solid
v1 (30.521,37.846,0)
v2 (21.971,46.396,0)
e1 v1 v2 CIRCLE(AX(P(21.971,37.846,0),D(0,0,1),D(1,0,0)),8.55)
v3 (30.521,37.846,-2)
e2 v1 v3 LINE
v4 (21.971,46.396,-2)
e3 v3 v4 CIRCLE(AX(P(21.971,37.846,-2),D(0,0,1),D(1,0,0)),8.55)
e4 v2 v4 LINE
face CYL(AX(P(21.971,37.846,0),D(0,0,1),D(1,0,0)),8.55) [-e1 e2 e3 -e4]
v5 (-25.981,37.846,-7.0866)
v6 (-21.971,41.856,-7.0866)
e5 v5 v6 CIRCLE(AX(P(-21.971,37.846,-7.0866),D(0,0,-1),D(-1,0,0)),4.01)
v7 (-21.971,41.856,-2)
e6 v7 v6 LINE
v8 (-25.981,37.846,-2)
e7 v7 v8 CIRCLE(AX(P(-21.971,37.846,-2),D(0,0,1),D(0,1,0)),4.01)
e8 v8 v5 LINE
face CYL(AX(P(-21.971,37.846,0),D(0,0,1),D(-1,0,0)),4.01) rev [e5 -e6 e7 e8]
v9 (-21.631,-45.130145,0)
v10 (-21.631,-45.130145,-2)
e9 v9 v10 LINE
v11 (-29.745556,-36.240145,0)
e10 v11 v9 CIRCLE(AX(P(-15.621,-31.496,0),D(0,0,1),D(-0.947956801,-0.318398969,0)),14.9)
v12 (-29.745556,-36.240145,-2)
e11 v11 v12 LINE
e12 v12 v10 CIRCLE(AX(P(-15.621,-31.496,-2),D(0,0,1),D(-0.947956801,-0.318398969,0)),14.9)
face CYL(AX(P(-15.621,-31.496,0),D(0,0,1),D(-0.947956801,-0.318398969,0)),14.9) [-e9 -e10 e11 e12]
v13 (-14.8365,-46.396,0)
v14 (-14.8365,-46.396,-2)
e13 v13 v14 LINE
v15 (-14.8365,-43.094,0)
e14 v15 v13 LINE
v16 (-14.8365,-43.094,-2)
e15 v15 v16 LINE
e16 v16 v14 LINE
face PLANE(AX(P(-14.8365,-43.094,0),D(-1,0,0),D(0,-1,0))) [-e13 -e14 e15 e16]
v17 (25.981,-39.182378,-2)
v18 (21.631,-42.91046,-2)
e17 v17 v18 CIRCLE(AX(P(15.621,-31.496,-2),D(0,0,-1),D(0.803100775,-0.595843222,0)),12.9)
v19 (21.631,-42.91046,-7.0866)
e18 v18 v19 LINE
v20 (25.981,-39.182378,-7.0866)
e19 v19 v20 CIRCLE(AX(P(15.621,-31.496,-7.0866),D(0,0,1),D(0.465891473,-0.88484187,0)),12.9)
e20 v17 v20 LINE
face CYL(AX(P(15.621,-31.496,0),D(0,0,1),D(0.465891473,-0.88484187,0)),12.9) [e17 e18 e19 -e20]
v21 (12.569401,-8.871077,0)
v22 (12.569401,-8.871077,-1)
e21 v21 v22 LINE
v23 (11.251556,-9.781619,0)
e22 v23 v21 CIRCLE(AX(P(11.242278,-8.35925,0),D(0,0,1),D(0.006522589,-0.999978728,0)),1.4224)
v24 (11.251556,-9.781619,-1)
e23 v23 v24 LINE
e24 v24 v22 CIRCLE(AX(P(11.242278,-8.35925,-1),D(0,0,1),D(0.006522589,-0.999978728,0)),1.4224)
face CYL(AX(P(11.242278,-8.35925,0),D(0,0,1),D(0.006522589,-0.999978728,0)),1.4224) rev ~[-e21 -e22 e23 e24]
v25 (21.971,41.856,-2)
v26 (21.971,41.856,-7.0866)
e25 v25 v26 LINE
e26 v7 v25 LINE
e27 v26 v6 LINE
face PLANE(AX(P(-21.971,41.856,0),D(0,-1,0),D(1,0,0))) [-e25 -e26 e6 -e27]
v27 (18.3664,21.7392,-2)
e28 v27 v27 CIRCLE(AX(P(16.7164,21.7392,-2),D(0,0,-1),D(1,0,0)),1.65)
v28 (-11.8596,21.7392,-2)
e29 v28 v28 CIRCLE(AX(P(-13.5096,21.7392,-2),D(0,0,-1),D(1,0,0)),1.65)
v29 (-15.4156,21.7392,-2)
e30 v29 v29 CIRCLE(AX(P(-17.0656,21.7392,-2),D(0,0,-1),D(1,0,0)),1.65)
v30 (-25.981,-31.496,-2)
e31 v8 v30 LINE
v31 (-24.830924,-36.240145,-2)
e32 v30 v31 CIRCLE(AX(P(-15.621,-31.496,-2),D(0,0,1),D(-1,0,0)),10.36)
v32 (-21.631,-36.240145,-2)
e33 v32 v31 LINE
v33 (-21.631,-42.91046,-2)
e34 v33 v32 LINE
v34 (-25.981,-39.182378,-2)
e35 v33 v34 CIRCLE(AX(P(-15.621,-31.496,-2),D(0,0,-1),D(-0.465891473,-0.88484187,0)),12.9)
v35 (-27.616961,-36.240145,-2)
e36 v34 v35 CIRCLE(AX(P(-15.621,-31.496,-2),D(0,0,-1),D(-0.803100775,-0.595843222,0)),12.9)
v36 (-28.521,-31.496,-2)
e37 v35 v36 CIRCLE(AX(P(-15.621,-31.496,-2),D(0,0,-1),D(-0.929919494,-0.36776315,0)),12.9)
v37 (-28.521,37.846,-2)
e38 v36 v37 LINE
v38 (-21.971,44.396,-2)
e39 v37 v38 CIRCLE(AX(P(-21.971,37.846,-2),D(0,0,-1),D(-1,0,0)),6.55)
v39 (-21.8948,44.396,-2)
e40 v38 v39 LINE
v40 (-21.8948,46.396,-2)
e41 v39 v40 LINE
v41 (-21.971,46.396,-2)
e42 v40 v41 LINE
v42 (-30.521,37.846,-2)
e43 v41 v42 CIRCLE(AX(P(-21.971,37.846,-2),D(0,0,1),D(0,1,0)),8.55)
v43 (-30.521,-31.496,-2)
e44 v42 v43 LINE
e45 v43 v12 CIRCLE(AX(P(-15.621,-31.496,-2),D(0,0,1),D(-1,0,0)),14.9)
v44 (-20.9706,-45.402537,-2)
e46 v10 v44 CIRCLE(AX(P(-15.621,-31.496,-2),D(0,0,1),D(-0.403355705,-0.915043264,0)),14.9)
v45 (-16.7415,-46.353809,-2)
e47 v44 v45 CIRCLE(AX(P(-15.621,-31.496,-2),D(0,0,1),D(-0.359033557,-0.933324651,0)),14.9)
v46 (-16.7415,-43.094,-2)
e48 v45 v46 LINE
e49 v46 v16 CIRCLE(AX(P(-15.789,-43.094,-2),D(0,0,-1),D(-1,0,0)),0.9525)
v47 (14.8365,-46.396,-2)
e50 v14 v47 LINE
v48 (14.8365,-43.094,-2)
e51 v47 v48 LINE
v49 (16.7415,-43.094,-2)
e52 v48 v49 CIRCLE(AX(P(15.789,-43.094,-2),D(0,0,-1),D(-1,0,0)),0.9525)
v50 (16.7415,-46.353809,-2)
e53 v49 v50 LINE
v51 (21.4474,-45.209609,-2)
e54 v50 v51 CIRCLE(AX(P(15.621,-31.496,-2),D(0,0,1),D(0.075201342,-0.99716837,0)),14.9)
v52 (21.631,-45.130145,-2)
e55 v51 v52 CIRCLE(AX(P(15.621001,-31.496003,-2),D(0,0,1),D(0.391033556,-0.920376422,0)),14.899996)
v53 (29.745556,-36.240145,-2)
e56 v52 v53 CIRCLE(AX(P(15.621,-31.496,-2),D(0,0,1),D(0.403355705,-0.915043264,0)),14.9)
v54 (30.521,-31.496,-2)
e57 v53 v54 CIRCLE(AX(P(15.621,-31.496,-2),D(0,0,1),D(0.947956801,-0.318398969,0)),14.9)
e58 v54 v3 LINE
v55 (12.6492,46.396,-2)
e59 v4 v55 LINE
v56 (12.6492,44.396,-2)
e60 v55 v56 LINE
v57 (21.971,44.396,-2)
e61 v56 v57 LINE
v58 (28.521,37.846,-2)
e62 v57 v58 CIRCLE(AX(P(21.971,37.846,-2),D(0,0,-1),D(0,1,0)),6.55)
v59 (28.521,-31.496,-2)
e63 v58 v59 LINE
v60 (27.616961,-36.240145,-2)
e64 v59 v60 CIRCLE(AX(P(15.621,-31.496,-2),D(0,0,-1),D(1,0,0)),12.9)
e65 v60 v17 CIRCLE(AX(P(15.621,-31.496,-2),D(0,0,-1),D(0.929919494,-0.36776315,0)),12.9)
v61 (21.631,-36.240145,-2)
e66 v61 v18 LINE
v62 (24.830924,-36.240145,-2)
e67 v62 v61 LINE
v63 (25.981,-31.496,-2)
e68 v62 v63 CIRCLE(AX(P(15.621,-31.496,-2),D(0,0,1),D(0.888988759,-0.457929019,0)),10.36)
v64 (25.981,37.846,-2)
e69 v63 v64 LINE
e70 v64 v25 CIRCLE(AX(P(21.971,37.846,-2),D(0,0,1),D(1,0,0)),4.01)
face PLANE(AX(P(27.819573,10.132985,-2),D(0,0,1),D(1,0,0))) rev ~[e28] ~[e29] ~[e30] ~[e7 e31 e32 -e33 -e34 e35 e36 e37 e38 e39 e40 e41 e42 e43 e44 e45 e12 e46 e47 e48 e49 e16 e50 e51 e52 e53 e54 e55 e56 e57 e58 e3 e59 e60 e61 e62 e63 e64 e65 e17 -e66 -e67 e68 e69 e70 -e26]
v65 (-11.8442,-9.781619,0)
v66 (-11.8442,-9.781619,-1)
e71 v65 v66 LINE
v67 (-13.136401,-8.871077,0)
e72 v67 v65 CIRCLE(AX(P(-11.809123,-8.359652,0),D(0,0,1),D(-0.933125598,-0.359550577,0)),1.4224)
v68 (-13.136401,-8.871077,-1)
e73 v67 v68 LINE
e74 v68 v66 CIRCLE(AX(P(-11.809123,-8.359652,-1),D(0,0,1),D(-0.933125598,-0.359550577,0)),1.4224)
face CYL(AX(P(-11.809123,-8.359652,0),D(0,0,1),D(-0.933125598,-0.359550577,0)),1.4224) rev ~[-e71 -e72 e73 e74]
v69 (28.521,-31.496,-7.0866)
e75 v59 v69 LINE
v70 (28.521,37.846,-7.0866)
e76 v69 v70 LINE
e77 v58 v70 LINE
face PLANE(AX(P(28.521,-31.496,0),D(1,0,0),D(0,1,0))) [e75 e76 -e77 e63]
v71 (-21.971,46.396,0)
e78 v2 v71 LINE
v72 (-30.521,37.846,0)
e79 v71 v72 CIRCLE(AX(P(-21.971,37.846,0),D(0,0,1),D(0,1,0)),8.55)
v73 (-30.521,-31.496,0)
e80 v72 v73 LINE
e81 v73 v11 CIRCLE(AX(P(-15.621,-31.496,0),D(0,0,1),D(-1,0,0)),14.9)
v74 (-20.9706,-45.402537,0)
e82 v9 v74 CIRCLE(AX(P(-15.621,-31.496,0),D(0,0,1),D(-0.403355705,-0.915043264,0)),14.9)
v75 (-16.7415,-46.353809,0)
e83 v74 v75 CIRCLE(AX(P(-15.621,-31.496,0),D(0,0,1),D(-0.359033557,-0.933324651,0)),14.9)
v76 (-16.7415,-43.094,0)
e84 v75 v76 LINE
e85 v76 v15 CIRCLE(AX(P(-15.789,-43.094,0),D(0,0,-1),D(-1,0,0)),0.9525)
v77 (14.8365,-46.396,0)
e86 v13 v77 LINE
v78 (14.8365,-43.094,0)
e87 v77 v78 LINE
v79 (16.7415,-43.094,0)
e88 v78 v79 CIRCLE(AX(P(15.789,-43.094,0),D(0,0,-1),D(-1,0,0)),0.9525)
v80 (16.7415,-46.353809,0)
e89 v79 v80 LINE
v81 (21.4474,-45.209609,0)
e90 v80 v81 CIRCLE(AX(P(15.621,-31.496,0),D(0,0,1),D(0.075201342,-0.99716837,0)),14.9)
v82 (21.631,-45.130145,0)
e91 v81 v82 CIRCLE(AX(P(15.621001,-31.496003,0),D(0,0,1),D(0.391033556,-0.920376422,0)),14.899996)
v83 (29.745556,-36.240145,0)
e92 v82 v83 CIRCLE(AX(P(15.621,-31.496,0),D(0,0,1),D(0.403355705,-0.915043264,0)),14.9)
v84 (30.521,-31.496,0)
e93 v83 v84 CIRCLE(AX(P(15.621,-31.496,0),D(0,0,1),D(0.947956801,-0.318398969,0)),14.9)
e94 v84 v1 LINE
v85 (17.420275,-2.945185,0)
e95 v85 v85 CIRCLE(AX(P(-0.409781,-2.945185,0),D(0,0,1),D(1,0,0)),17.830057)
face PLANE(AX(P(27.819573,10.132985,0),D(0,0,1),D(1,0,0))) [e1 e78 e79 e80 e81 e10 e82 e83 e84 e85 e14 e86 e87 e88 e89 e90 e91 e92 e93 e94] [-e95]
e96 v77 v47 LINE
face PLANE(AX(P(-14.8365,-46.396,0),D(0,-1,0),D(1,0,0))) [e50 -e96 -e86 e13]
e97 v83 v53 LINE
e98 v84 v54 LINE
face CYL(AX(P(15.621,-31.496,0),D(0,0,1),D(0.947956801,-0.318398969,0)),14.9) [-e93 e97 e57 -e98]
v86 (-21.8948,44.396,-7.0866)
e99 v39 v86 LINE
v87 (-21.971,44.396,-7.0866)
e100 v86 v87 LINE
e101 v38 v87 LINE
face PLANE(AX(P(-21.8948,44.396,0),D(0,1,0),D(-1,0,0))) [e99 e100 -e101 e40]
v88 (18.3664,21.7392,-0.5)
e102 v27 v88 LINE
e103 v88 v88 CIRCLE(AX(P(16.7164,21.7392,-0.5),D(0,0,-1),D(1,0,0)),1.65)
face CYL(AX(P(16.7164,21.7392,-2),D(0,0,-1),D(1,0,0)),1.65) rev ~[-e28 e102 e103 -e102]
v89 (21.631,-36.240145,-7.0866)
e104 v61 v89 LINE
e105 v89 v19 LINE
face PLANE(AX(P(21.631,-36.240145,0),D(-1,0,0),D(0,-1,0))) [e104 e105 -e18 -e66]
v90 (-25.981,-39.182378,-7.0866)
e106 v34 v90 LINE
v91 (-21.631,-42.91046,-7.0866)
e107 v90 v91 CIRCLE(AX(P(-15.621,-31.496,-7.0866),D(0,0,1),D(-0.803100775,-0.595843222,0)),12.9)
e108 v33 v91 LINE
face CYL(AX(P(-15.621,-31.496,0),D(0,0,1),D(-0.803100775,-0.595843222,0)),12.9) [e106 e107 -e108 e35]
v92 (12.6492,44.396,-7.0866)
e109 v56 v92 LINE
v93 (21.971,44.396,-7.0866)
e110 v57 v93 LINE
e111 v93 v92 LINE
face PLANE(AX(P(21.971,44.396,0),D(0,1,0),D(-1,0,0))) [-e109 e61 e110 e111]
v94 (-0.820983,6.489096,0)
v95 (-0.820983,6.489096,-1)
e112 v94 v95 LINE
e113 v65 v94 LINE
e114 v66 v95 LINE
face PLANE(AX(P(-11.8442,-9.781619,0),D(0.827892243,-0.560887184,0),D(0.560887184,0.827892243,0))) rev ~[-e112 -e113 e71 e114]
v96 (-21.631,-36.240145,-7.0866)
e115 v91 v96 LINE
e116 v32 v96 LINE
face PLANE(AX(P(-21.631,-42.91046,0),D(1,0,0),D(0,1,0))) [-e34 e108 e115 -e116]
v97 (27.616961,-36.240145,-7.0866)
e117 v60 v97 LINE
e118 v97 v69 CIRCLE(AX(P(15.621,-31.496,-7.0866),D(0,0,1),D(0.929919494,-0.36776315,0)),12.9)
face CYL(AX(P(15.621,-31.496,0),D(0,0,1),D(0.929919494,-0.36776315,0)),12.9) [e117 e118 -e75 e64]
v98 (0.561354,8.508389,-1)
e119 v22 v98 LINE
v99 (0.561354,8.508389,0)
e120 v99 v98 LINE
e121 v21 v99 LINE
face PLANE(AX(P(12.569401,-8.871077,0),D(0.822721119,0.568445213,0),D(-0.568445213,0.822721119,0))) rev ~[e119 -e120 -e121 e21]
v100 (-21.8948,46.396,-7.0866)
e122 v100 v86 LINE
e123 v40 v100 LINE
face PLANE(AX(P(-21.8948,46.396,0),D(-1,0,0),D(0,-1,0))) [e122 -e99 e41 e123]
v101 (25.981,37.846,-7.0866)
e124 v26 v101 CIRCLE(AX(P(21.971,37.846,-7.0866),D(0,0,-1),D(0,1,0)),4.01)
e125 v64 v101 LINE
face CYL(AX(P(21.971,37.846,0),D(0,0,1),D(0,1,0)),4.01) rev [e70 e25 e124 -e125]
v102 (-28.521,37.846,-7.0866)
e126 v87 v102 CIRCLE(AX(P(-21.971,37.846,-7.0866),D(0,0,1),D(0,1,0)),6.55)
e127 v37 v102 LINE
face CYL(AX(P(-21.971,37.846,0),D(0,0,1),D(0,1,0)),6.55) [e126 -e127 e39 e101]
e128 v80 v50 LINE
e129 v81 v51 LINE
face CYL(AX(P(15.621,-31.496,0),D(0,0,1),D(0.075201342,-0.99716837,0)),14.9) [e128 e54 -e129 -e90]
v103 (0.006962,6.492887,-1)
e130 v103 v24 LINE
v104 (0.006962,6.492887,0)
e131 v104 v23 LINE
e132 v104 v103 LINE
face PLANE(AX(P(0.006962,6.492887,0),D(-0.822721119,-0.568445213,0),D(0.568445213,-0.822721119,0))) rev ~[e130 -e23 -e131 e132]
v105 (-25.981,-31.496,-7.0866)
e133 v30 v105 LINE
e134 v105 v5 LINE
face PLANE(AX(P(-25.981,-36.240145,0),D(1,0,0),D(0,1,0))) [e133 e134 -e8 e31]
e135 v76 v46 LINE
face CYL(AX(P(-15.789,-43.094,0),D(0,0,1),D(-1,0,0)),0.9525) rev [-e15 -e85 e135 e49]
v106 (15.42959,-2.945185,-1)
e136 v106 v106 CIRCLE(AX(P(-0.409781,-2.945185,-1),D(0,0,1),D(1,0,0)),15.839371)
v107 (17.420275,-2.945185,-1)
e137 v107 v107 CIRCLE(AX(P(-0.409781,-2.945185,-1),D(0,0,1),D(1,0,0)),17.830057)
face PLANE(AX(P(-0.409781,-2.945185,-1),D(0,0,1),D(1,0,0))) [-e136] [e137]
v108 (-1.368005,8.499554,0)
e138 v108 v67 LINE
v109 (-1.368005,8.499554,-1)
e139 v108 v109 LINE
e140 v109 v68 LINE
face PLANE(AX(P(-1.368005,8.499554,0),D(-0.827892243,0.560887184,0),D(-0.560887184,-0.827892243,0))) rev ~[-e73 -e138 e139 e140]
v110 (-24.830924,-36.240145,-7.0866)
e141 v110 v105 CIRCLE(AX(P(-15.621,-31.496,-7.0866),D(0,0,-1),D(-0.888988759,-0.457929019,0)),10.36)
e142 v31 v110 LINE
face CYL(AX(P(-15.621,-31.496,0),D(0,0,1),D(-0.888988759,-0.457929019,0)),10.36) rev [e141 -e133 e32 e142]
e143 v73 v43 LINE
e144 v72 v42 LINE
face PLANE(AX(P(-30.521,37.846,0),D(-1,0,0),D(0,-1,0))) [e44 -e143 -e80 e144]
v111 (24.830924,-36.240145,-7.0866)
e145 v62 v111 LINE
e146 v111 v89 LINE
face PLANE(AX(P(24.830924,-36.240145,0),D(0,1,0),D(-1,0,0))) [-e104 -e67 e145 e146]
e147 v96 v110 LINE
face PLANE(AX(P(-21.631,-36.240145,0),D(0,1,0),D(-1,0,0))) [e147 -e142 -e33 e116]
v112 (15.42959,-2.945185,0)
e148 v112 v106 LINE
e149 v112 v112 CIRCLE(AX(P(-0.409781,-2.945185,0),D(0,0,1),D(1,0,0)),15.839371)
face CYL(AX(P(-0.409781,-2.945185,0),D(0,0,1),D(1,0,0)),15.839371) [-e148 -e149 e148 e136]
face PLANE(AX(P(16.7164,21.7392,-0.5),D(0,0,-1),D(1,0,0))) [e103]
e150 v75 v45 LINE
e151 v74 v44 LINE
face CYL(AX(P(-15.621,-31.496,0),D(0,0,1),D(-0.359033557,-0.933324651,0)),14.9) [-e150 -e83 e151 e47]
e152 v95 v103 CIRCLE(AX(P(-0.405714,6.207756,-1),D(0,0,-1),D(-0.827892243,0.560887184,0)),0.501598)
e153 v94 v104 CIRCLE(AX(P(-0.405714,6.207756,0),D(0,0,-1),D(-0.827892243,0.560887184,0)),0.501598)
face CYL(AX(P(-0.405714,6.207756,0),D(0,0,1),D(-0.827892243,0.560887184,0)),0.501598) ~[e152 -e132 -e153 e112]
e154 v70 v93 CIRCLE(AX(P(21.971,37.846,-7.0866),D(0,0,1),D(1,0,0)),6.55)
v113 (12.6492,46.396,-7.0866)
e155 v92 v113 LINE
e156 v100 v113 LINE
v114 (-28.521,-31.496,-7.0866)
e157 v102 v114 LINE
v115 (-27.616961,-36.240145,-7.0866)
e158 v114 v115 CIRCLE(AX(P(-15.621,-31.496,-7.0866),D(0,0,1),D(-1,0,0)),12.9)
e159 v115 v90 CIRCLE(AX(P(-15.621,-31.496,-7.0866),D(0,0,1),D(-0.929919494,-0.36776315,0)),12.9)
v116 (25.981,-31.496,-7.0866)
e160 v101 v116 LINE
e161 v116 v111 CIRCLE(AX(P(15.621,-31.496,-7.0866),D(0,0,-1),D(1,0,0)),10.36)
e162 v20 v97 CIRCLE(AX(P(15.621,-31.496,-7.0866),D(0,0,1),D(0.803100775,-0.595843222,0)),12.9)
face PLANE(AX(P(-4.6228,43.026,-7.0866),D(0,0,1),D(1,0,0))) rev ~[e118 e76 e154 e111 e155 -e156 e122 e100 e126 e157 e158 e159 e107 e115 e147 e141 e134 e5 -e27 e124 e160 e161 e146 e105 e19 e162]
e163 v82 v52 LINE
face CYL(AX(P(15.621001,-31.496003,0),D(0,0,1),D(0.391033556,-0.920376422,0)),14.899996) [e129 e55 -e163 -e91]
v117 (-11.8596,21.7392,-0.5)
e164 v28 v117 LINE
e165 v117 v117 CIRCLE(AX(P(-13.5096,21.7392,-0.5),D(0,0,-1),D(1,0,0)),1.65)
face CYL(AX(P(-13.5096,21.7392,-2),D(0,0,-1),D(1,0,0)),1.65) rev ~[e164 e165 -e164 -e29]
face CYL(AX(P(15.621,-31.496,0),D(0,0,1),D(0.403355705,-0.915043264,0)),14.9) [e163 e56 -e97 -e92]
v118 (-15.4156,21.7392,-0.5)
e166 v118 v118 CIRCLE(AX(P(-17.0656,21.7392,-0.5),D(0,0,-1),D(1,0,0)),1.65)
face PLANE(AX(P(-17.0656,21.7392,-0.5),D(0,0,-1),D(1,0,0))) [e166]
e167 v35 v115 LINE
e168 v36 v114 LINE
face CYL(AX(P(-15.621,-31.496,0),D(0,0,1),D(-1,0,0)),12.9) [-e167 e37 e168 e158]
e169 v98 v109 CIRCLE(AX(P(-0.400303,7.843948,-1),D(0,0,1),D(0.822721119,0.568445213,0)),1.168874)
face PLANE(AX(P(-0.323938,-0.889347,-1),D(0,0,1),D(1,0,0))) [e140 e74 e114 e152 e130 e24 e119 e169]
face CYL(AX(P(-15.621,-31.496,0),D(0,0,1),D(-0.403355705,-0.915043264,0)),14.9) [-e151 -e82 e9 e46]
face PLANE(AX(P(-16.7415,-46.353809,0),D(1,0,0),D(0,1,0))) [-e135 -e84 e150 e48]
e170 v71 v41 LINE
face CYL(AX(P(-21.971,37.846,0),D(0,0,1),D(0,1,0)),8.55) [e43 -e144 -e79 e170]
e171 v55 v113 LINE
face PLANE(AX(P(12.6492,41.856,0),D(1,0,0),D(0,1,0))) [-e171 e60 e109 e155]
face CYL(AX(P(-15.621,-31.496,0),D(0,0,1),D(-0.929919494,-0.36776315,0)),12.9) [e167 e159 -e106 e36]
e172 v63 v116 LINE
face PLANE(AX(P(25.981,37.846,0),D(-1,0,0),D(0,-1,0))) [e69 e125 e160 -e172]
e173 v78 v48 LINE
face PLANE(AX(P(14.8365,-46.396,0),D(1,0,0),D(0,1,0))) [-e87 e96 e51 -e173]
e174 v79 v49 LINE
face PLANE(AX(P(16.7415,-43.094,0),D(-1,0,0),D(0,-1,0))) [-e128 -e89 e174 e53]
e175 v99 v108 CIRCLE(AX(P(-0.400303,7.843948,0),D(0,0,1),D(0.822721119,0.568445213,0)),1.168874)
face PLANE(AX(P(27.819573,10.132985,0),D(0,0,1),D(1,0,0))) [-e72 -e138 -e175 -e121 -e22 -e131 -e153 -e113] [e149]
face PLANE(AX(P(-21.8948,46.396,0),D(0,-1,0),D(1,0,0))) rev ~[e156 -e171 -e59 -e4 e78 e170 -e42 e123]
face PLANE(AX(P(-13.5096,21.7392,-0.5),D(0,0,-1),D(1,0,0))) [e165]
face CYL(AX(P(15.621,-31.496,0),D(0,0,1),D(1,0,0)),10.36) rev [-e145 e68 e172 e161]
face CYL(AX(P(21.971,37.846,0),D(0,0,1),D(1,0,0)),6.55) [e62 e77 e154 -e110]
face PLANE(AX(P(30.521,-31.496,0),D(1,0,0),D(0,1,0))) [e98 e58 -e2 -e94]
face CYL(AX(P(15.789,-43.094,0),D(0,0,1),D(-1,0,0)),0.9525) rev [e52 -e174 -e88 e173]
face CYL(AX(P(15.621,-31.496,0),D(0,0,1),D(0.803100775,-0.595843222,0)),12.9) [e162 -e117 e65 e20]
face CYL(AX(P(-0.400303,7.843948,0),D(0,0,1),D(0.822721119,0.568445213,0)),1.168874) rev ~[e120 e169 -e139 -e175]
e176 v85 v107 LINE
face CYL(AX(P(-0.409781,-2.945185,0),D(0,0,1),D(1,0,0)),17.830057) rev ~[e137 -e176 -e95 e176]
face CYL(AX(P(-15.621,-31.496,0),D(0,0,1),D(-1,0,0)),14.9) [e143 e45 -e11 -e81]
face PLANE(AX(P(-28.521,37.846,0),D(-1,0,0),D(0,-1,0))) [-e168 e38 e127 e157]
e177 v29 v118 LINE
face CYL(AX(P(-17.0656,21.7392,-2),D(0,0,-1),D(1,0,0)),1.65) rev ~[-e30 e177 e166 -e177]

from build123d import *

# Parameters (mm, degrees)
F0_W     = 34.544
F0_H     = 0.2
F0_H_2   = 2
F1_DEPTH = 7.0866
F0_W_2   = 29.673
F2_DEPTH = 2
F0_W_3   = 2.34
F0_H_3   = 4.318
F0_W_4   = 0.2
F3_DEPTH = 7.0866
F4_R     = 17.8300566071
F4_R_2   = 15.8393710275
F5_DEPTH = 1
F6_R     = 1.65
F7_DEPTH = 1.5


with BuildPart() as f1:
    # F0 (on Top) → F1 (new body)
    with BuildSketch(Plane.XY):
        Polygon((12.6492, 41.856), (12.6492, 44.196), (-21.8948, 44.196), (-21.8948, 42.396), (-21.8948, 41.856), align=None)
        with Locations((-4.6228, 44.296)):
            Rectangle(F0_W, F0_H)
        with BuildLine():
            Line((-21.8948, 42.396), (-21.8948, 44.196))
            Line((-21.8948, 44.196), (-21.971, 44.196))
            ThreePointArc((-21.971, 44.196), (-26.4611280605, 42.3361280605), (-28.321, 37.846))
            Line((-28.321, 37.846), (-28.321, -31.496))
            ThreePointArc((-28.321, -31.496), (-28.0890375223, -33.9122037045), (-27.4016235683, -36.2401446376))
            Line((-27.4016235683, -36.2401446376), (-25.981, -36.2401446376))
            Line((-25.981, -36.2401446376), (-25.981, -31.496))
            Line((-25.981, -31.496), (-25.981, 37.846))
            ThreePointArc((-25.981, 37.846), (-24.8064981926, 40.6814981926), (-21.971, 41.856))
            Line((-21.971, 41.856), (-21.8948, 41.856))
            Line((-21.8948, 41.856), (-21.8948, 42.396))
        make_face()
        with Locations((-4.6228, 45.396)):
            Rectangle(F0_W, F0_H_2)
    extrude(amount=-F1_DEPTH)

    # F0 (on Top) → F2 (join)
    with BuildSketch(Plane.XY):
        with BuildLine():
            Line((12.6492, 46.396), (12.6492, 44.396))
            Line((12.6492, 44.396), (21.971, 44.396))
            ThreePointArc((21.971, 44.396), (26.6025494168, 42.4775494168), (28.521, 37.846))
            Line((28.521, 37.846), (28.521, 33.8582))
            Line((28.521, 33.8582), (28.521, 29.5402))
            Line((28.521, 29.5402), (28.521, -31.496))
            ThreePointArc((28.521, -31.496), (28.2929750434, -33.910756406), (27.6169614728, -36.2401446376))
            Line((27.6169614728, -36.2401446376), (29.7455563349, -36.2401446376))
            ThreePointArc((29.7455563349, -36.2401446376), (30.3258612606, -33.8995505622), (30.521, -31.496))
            Line((30.521, -31.496), (30.521, 37.846))
            ThreePointArc((30.521, 37.846), (28.0167629791, 43.8917629791), (21.971, 46.396))
            Line((21.971, 46.396), (12.6492, 46.396))
        make_face()
        with BuildLine():
            ThreePointArc((16.7415, -46.3538087129), (19.1412490439, -45.9741851994), (21.4474, -45.2096086804))
            Line((21.4474, -45.2096086804), (21.4474, -43.0052598824))
            ThreePointArc((21.4474, -43.0052598824), (19.1586666659, -43.9014389105), (16.7415, -44.347244288))
            Line((16.7415, -44.347244288), (16.7415, -46.3538087129))
        make_face()
        with BuildLine():
            Line((21.971, 41.856), (12.6492, 41.856))
            Line((12.6492, 41.856), (-21.8948, 41.856))
            Line((-21.8948, 41.856), (-21.971, 41.856))
            ThreePointArc((-21.971, 41.856), (-24.8064981926, 40.6814981926), (-25.981, 37.846))
            Line((-25.981, 37.846), (-25.981, -31.496))
            ThreePointArc((-25.981, -31.496), (-25.6893764307, -33.9367777552), (-24.8309235424, -36.2401446376))
            Line((-24.8309235424, -36.2401446376), (-21.631, -36.2401446376))
            Line((-21.631, -36.2401446376), (-21.631, -39.9345721541))
            ThreePointArc((-21.631, -39.9345721541), (-18.7758369596, -41.3639584392), (-15.621, -41.856))
            Line((-15.621, -41.856), (15.621, -41.856))
            ThreePointArc((15.621, -41.856), (18.7758369596, -41.3639584392), (21.631, -39.9345721541))
            Line((21.631, -39.9345721541), (21.631, -36.2401446376))
            Line((21.631, -36.2401446376), (24.8309235424, -36.2401446376))
            ThreePointArc((24.8309235424, -36.2401446376), (25.6893764307, -33.9367777552), (25.981, -31.496))
            Line((25.981, -31.496), (25.981, 29.5402))
            Line((25.981, 29.5402), (25.981, 33.8582))
            Line((25.981, 33.8582), (25.981, 37.846))
            ThreePointArc((25.981, 37.846), (24.8064981926, 40.6814981926), (21.971, 41.856))
        make_face()
        with Locations((0, -45.396)):
            Rectangle(F0_W_2, F0_H_2)
        with BuildLine():
            Line((-21.971, 44.396), (-21.8948, 44.396))
            Line((-21.8948, 44.396), (-21.8948, 46.396))
            Line((-21.8948, 46.396), (-21.971, 46.396))
            ThreePointArc((-21.971, 46.396), (-28.0167629791, 43.8917629791), (-30.521, 37.846))
            Line((-30.521, 37.846), (-30.521, -31.496))
            ThreePointArc((-30.521, -31.496), (-30.3258612606, -33.8995505622), (-29.7455563349, -36.2401446376))
            Line((-29.7455563349, -36.2401446376), (-27.6169614728, -36.2401446376))
            ThreePointArc((-27.6169614728, -36.2401446376), (-28.2929750434, -33.910756406), (-28.521, -31.496))
            Line((-28.521, -31.496), (-28.521, 37.846))
            ThreePointArc((-28.521, 37.846), (-26.6025494168, 42.4775494168), (-21.971, 44.396))
        make_face()
        with Locations((0, -44.296)):
            Rectangle(F0_W_2, F0_H)
        with BuildLine():
            Line((-16.7415, -46.3538087129), (-16.7415, -44.347244288))
            ThreePointArc((-16.7415, -44.347244288), (-18.9035466854, -43.9713712273), (-20.9706, -43.2344743404))
            Line((-20.9706, -43.2344743404), (-20.9706, -45.4025373059))
            ThreePointArc((-20.9706, -45.4025373059), (-18.8908284091, -46.0327885785), (-16.7415, -46.3538087129))
        make_face()
        with BuildLine():
            Line((21.631, -42.9104601274), (21.631, -42.6839354664))
            ThreePointArc((21.631, -42.6839354664), (19.2604727553, -43.663343098), (16.7415, -44.146473499))
            Line((16.7415, -44.146473499), (16.7415, -44.347244288))
            ThreePointArc((16.7415, -44.347244288), (19.1586666659, -43.9014389105), (21.4474, -43.0052598824))
            ThreePointArc((21.4474, -43.0052598824), (21.5393898138, -42.95822762), (21.631, -42.9104601274))
        make_face()
        with BuildLine():
            ThreePointArc((16.7415, -44.146473499), (19.2604727553, -43.663343098), (21.631, -42.6839354664))
            Line((21.631, -42.6839354664), (21.631, -39.9345721541))
            ThreePointArc((21.631, -39.9345721541), (18.7758369596, -41.3639584392), (15.621, -41.856))
            Line((15.621, -41.856), (-15.621, -41.856))
            ThreePointArc((-15.621, -41.856), (-18.7758369596, -41.3639584392), (-21.631, -39.9345721541))
            Line((-21.631, -39.9345721541), (-21.631, -42.6839354664))
            ThreePointArc((-21.631, -42.6839354664), (-19.2604727553, -43.663343098), (-16.7415, -44.146473499))
            Line((-16.7415, -44.146473499), (-16.7415, -43.094))
            ThreePointArc((-16.7415, -43.094), (-15.789, -42.1415), (-14.8365, -43.094))
            Line((-14.8365, -43.094), (-14.8365, -44.196))
            Line((-14.8365, -44.196), (14.8365, -44.196))
            Line((14.8365, -44.196), (14.8365, -43.094))
            ThreePointArc((14.8365, -43.094), (15.789, -42.1415), (16.7415, -43.094))
            Line((16.7415, -43.094), (16.7415, -44.146473499))
        make_face()
        with BuildLine():
            Line((29.7455563349, -36.2401446376), (27.6169614728, -36.2401446376))
            ThreePointArc((27.6169614728, -36.2401446376), (26.8953708022, -37.7648565954), (25.981, -39.1823775603))
            ThreePointArc((25.981, -39.1823775603), (24.0155741349, -41.2909540628), (21.631, -42.9104601274))
            Line((21.631, -42.9104601274), (21.631, -45.1301446376))
            ThreePointArc((21.631, -45.1301446376), (26.6259132073, -41.5409930463), (29.7455563349, -36.2401446376))
        make_face()
        with BuildLine():
            ThreePointArc((21.631, -39.9345721541), (23.4519461004, -38.2787636825), (24.8309235424, -36.2401446376))
            Line((24.8309235424, -36.2401446376), (21.631, -36.2401446376))
            Line((21.631, -36.2401446376), (21.631, -39.9345721541))
        make_face()
        with BuildLine():
            Line((-21.631, -36.2401446376), (-24.8309235424, -36.2401446376))
            ThreePointArc((-24.8309235424, -36.2401446376), (-23.4519461004, -38.2787636825), (-21.631, -39.9345721541))
            Line((-21.631, -39.9345721541), (-21.631, -36.2401446376))
        make_face()
        with BuildLine():
            ThreePointArc((-25.981, -39.1823775603), (-26.8953708022, -37.7648565954), (-27.6169614728, -36.2401446376))
            Line((-27.6169614728, -36.2401446376), (-29.7455563349, -36.2401446376))
            ThreePointArc((-29.7455563349, -36.2401446376), (-26.6259132073, -41.5409930463), (-21.631, -45.1301446376))
            Line((-21.631, -45.1301446376), (-21.631, -42.9104601274))
            ThreePointArc((-21.631, -42.9104601274), (-24.0155741349, -41.2909540628), (-25.981, -39.1823775603))
        make_face()
        with BuildLine():
            ThreePointArc((-20.9706, -43.2344743404), (-21.3031100256, -43.0771754869), (-21.631, -42.9104601274))
            Line((-21.631, -42.9104601274), (-21.631, -45.1301446376))
            ThreePointArc((-21.631, -45.1301446376), (-21.3024326962, -45.2702993476), (-20.9706, -45.4025373059))
            Line((-20.9706, -45.4025373059), (-20.9706, -43.2344743404))
        make_face()
        with BuildLine():
            ThreePointArc((21.4474, -45.2096086804), (21.5393333696, -45.1701848067), (21.631, -45.1301446376))
            Line((21.631, -45.1301446376), (21.631, -42.9104601274))
            ThreePointArc((21.631, -42.9104601274), (21.5393898138, -42.95822762), (21.4474, -43.0052598824))
            Line((21.4474, -43.0052598824), (21.4474, -45.2096086804))
        make_face()
        with BuildLine():
            ThreePointArc((-16.7415, -44.146473499), (-19.2604727553, -43.663343098), (-21.631, -42.6839354664))
            Line((-21.631, -42.6839354664), (-21.631, -42.9104601274))
            ThreePointArc((-21.631, -42.9104601274), (-21.3031100256, -43.0771754869), (-20.9706, -43.2344743404))
            ThreePointArc((-20.9706, -43.2344743404), (-18.9035466854, -43.9713712273), (-16.7415, -44.347244288))
            Line((-16.7415, -44.347244288), (-16.7415, -44.146473499))
        make_face()
    extrude(amount=-F2_DEPTH)

    # F0 (on Top) → F3 (join)
    with BuildSketch(Plane.XY):
        with BuildLine():
            Line((-21.8948, 42.396), (-21.8948, 44.196))
            Line((-21.8948, 44.196), (-21.971, 44.196))
            ThreePointArc((-21.971, 44.196), (-26.4611280605, 42.3361280605), (-28.321, 37.846))
            Line((-28.321, 37.846), (-28.321, -31.496))
            ThreePointArc((-28.321, -31.496), (-28.0890375223, -33.9122037045), (-27.4016235683, -36.2401446376))
            Line((-27.4016235683, -36.2401446376), (-25.981, -36.2401446376))
            Line((-25.981, -36.2401446376), (-25.981, -31.496))
            Line((-25.981, -31.496), (-25.981, 37.846))
            ThreePointArc((-25.981, 37.846), (-24.8064981926, 40.6814981926), (-21.971, 41.856))
            Line((-21.971, 41.856), (-21.8948, 41.856))
            Line((-21.8948, 41.856), (-21.8948, 42.396))
        make_face()
        with BuildLine():
            ThreePointArc((28.321, 37.846), (26.4611280605, 42.3361280605), (21.971, 44.196))
            Line((21.971, 44.196), (12.6492, 44.196))
            Line((12.6492, 44.196), (12.6492, 41.856))
            Line((12.6492, 41.856), (21.971, 41.856))
            ThreePointArc((21.971, 41.856), (24.8064981926, 40.6814981926), (25.981, 37.846))
            Line((25.981, 37.846), (25.981, 33.8582))
            Line((25.981, 33.8582), (28.321, 33.8582))
            Line((28.321, 33.8582), (28.321, 37.846))
        make_face()
        with Locations((27.151, 31.6992)):
            Rectangle(F0_W_3, F0_H_3)
        with BuildLine():
            Line((28.321, -31.496), (28.321, 29.5402))
            Line((28.321, 29.5402), (25.981, 29.5402))
            Line((25.981, 29.5402), (25.981, -31.496))
            Line((25.981, -31.496), (25.981, -36.2401446376))
            Line((25.981, -36.2401446376), (27.4016235683, -36.2401446376))
            ThreePointArc((27.4016235683, -36.2401446376), (28.0890375223, -33.9122037045), (28.321, -31.496))
        make_face()
        with BuildLine():
            Line((12.6492, 44.196), (21.971, 44.196))
            ThreePointArc((21.971, 44.196), (26.4611280605, 42.3361280605), (28.321, 37.846))
            Line((28.321, 37.846), (28.321, 33.8582))
            Line((28.321, 33.8582), (28.521, 33.8582))
            Line((28.521, 33.8582), (28.521, 37.846))
            ThreePointArc((28.521, 37.846), (26.6025494168, 42.4775494168), (21.971, 44.396))
            Line((21.971, 44.396), (12.6492, 44.396))
            Line((12.6492, 44.396), (12.6492, 44.196))
        make_face()
        with Locations((28.421, 31.6992)):
            Rectangle(F0_W_4, F0_H_3)
        with BuildLine():
            Line((28.521, 29.5402), (28.321, 29.5402))
            Line((28.321, 29.5402), (28.321, -31.496))
            ThreePointArc((28.321, -31.496), (28.0890375223, -33.9122037045), (27.4016235683, -36.2401446376))
            Line((27.4016235683, -36.2401446376), (27.6169614728, -36.2401446376))
            ThreePointArc((27.6169614728, -36.2401446376), (28.2929750434, -33.910756406), (28.521, -31.496))
            Line((28.521, -31.496), (28.521, 29.5402))
        make_face()
        with BuildLine():
            Line((-21.971, 44.196), (-21.8948, 44.196))
            Line((-21.8948, 44.196), (-21.8948, 44.396))
            Line((-21.8948, 44.396), (-21.971, 44.396))
            ThreePointArc((-21.971, 44.396), (-26.6025494168, 42.4775494168), (-28.521, 37.846))
            Line((-28.521, 37.846), (-28.521, -31.496))
            ThreePointArc((-28.521, -31.496), (-28.2929750434, -33.910756406), (-27.6169614728, -36.2401446376))
            Line((-27.6169614728, -36.2401446376), (-27.4016235683, -36.2401446376))
            ThreePointArc((-27.4016235683, -36.2401446376), (-28.0890375223, -33.9122037045), (-28.321, -31.496))
            Line((-28.321, -31.496), (-28.321, 37.846))
            ThreePointArc((-28.321, 37.846), (-26.4611280605, 42.3361280605), (-21.971, 44.196))
        make_face()
        with BuildLine():
            ThreePointArc((-24.8309235424, -36.2401446376), (-25.6893764307, -33.9367777552), (-25.981, -31.496))
            Line((-25.981, -31.496), (-25.981, -36.2401446376))
            Line((-25.981, -36.2401446376), (-24.8309235424, -36.2401446376))
        make_face()
        with BuildLine():
            Line((-25.981, -36.2401446376), (-27.4016235683, -36.2401446376))
            ThreePointArc((-27.4016235683, -36.2401446376), (-26.7674757756, -37.5825489223), (-25.981, -38.8417742955))
            Line((-25.981, -38.8417742955), (-25.981, -36.2401446376))
        make_face()
        with BuildLine():
            Line((-25.981, -36.2401446376), (-25.981, -38.8417742955))
            ThreePointArc((-25.981, -38.8417742955), (-24.0284238394, -41.0146776594), (-21.631, -42.6839354664))
            Line((-21.631, -42.6839354664), (-21.631, -39.9345721541))
            ThreePointArc((-21.631, -39.9345721541), (-23.4519461004, -38.2787636825), (-24.8309235424, -36.2401446376))
            Line((-24.8309235424, -36.2401446376), (-25.981, -36.2401446376))
        make_face()
        with BuildLine():
            Line((-21.631, -36.2401446376), (-24.8309235424, -36.2401446376))
            ThreePointArc((-24.8309235424, -36.2401446376), (-23.4519461004, -38.2787636825), (-21.631, -39.9345721541))
            Line((-21.631, -39.9345721541), (-21.631, -36.2401446376))
        make_face()
        with BuildLine():
            ThreePointArc((-25.981, -38.8417742955), (-26.7674757756, -37.5825489223), (-27.4016235683, -36.2401446376))
            Line((-27.4016235683, -36.2401446376), (-27.6169614728, -36.2401446376))
            ThreePointArc((-27.6169614728, -36.2401446376), (-26.8953708022, -37.7648565954), (-25.981, -39.1823775603))
            Line((-25.981, -39.1823775603), (-25.981, -38.8417742955))
        make_face()
        with BuildLine():
            ThreePointArc((-21.631, -42.6839354664), (-24.0284238394, -41.0146776594), (-25.981, -38.8417742955))
            Line((-25.981, -38.8417742955), (-25.981, -39.1823775603))
            ThreePointArc((-25.981, -39.1823775603), (-24.0155741349, -41.2909540628), (-21.631, -42.9104601274))
            Line((-21.631, -42.9104601274), (-21.631, -42.6839354664))
        make_face()
        with BuildLine():
            Line((25.981, -36.2401446376), (25.981, -31.496))
            ThreePointArc((25.981, -31.496), (25.6893764307, -33.9367777552), (24.8309235424, -36.2401446376))
            Line((24.8309235424, -36.2401446376), (25.981, -36.2401446376))
        make_face()
        with BuildLine():
            ThreePointArc((25.981, -38.8417742955), (26.7674757756, -37.5825489223), (27.4016235683, -36.2401446376))
            Line((27.4016235683, -36.2401446376), (25.981, -36.2401446376))
            Line((25.981, -36.2401446376), (25.981, -38.8417742955))
        make_face()
        with BuildLine():
            ThreePointArc((21.631, -42.6839354664), (24.0284238394, -41.0146776594), (25.981, -38.8417742955))
            Line((25.981, -38.8417742955), (25.981, -36.2401446376))
            Line((25.981, -36.2401446376), (24.8309235424, -36.2401446376))
            ThreePointArc((24.8309235424, -36.2401446376), (23.4519461004, -38.2787636825), (21.631, -39.9345721541))
            Line((21.631, -39.9345721541), (21.631, -42.6839354664))
        make_face()
        with BuildLine():
            Line((25.981, -39.1823775603), (25.981, -38.8417742955))
            ThreePointArc((25.981, -38.8417742955), (24.0284238394, -41.0146776594), (21.631, -42.6839354664))
            Line((21.631, -42.6839354664), (21.631, -42.9104601274))
            ThreePointArc((21.631, -42.9104601274), (24.0155741349, -41.2909540628), (25.981, -39.1823775603))
        make_face()
        with BuildLine():
            Line((27.6169614728, -36.2401446376), (27.4016235683, -36.2401446376))
            ThreePointArc((27.4016235683, -36.2401446376), (26.7674757756, -37.5825489223), (25.981, -38.8417742955))
            Line((25.981, -38.8417742955), (25.981, -39.1823775603))
            ThreePointArc((25.981, -39.1823775603), (26.8953708022, -37.7648565954), (27.6169614728, -36.2401446376))
        make_face()
        with BuildLine():
            ThreePointArc((21.631, -39.9345721541), (23.4519461004, -38.2787636825), (24.8309235424, -36.2401446376))
            Line((24.8309235424, -36.2401446376), (21.631, -36.2401446376))
            Line((21.631, -36.2401446376), (21.631, -39.9345721541))
        make_face()
    extrude(amount=-F3_DEPTH)

    # F4 (on face) → F5 (cut)
    with BuildSketch(Plane.XY):
        with Locations((-0.4097813458, -2.9451847493)):
            Circle(F4_R)
        with Locations((-0.4097813458, -2.9451847493)):
            Circle(F4_R_2, mode=Mode.SUBTRACT)
        with BuildLine():
            ThreePointArc((0.5613541242, 8.5083885599), (-0.4056551824, 9.0128094008), (-1.3680046302, 8.4995541776))
            Line((-1.3680046302, 8.4995541776), (-13.1364011854, -8.8710766702))
            ThreePointArc((-13.1364011854, -8.8710766702), (-12.6284368081, -9.5223845688), (-11.8442001663, -9.7816193603))
            Line((-11.8442001663, -9.7816193603), (-0.8209832597, 6.4890960886))
            ThreePointArc((-0.8209832597, 6.4890960886), (-0.4080106872, 6.7093490647), (0.0069615684, 6.492887183))
            Line((0.0069615684, 6.492887183), (11.2515560359, -9.7816193603))
            ThreePointArc((11.2515560359, -9.7816193603), (12.050834777, -9.5294881376), (12.5694010689, -8.8710766702))
            Line((12.5694010689, -8.8710766702), (0.5613541242, 8.5083885599))
        make_face()
    extrude(amount=-F5_DEPTH, mode=Mode.SUBTRACT)

    # F6 (on face) → F7 (cut)
    with BuildSketch(Plane(origin=(0, 0, -2), x_dir=(1, 0, 0), z_dir=(0, 0, -1))):
        with Locations((-17.0656, -21.7392)):
            Circle(F6_R)
        with Locations((-13.5096, -21.7392)):
            Circle(F6_R)
        with Locations((16.7164, -21.7392)):
            Circle(F6_R)
    extrude(amount=-F7_DEPTH, mode=Mode.SUBTRACT)


solid = f1.part
